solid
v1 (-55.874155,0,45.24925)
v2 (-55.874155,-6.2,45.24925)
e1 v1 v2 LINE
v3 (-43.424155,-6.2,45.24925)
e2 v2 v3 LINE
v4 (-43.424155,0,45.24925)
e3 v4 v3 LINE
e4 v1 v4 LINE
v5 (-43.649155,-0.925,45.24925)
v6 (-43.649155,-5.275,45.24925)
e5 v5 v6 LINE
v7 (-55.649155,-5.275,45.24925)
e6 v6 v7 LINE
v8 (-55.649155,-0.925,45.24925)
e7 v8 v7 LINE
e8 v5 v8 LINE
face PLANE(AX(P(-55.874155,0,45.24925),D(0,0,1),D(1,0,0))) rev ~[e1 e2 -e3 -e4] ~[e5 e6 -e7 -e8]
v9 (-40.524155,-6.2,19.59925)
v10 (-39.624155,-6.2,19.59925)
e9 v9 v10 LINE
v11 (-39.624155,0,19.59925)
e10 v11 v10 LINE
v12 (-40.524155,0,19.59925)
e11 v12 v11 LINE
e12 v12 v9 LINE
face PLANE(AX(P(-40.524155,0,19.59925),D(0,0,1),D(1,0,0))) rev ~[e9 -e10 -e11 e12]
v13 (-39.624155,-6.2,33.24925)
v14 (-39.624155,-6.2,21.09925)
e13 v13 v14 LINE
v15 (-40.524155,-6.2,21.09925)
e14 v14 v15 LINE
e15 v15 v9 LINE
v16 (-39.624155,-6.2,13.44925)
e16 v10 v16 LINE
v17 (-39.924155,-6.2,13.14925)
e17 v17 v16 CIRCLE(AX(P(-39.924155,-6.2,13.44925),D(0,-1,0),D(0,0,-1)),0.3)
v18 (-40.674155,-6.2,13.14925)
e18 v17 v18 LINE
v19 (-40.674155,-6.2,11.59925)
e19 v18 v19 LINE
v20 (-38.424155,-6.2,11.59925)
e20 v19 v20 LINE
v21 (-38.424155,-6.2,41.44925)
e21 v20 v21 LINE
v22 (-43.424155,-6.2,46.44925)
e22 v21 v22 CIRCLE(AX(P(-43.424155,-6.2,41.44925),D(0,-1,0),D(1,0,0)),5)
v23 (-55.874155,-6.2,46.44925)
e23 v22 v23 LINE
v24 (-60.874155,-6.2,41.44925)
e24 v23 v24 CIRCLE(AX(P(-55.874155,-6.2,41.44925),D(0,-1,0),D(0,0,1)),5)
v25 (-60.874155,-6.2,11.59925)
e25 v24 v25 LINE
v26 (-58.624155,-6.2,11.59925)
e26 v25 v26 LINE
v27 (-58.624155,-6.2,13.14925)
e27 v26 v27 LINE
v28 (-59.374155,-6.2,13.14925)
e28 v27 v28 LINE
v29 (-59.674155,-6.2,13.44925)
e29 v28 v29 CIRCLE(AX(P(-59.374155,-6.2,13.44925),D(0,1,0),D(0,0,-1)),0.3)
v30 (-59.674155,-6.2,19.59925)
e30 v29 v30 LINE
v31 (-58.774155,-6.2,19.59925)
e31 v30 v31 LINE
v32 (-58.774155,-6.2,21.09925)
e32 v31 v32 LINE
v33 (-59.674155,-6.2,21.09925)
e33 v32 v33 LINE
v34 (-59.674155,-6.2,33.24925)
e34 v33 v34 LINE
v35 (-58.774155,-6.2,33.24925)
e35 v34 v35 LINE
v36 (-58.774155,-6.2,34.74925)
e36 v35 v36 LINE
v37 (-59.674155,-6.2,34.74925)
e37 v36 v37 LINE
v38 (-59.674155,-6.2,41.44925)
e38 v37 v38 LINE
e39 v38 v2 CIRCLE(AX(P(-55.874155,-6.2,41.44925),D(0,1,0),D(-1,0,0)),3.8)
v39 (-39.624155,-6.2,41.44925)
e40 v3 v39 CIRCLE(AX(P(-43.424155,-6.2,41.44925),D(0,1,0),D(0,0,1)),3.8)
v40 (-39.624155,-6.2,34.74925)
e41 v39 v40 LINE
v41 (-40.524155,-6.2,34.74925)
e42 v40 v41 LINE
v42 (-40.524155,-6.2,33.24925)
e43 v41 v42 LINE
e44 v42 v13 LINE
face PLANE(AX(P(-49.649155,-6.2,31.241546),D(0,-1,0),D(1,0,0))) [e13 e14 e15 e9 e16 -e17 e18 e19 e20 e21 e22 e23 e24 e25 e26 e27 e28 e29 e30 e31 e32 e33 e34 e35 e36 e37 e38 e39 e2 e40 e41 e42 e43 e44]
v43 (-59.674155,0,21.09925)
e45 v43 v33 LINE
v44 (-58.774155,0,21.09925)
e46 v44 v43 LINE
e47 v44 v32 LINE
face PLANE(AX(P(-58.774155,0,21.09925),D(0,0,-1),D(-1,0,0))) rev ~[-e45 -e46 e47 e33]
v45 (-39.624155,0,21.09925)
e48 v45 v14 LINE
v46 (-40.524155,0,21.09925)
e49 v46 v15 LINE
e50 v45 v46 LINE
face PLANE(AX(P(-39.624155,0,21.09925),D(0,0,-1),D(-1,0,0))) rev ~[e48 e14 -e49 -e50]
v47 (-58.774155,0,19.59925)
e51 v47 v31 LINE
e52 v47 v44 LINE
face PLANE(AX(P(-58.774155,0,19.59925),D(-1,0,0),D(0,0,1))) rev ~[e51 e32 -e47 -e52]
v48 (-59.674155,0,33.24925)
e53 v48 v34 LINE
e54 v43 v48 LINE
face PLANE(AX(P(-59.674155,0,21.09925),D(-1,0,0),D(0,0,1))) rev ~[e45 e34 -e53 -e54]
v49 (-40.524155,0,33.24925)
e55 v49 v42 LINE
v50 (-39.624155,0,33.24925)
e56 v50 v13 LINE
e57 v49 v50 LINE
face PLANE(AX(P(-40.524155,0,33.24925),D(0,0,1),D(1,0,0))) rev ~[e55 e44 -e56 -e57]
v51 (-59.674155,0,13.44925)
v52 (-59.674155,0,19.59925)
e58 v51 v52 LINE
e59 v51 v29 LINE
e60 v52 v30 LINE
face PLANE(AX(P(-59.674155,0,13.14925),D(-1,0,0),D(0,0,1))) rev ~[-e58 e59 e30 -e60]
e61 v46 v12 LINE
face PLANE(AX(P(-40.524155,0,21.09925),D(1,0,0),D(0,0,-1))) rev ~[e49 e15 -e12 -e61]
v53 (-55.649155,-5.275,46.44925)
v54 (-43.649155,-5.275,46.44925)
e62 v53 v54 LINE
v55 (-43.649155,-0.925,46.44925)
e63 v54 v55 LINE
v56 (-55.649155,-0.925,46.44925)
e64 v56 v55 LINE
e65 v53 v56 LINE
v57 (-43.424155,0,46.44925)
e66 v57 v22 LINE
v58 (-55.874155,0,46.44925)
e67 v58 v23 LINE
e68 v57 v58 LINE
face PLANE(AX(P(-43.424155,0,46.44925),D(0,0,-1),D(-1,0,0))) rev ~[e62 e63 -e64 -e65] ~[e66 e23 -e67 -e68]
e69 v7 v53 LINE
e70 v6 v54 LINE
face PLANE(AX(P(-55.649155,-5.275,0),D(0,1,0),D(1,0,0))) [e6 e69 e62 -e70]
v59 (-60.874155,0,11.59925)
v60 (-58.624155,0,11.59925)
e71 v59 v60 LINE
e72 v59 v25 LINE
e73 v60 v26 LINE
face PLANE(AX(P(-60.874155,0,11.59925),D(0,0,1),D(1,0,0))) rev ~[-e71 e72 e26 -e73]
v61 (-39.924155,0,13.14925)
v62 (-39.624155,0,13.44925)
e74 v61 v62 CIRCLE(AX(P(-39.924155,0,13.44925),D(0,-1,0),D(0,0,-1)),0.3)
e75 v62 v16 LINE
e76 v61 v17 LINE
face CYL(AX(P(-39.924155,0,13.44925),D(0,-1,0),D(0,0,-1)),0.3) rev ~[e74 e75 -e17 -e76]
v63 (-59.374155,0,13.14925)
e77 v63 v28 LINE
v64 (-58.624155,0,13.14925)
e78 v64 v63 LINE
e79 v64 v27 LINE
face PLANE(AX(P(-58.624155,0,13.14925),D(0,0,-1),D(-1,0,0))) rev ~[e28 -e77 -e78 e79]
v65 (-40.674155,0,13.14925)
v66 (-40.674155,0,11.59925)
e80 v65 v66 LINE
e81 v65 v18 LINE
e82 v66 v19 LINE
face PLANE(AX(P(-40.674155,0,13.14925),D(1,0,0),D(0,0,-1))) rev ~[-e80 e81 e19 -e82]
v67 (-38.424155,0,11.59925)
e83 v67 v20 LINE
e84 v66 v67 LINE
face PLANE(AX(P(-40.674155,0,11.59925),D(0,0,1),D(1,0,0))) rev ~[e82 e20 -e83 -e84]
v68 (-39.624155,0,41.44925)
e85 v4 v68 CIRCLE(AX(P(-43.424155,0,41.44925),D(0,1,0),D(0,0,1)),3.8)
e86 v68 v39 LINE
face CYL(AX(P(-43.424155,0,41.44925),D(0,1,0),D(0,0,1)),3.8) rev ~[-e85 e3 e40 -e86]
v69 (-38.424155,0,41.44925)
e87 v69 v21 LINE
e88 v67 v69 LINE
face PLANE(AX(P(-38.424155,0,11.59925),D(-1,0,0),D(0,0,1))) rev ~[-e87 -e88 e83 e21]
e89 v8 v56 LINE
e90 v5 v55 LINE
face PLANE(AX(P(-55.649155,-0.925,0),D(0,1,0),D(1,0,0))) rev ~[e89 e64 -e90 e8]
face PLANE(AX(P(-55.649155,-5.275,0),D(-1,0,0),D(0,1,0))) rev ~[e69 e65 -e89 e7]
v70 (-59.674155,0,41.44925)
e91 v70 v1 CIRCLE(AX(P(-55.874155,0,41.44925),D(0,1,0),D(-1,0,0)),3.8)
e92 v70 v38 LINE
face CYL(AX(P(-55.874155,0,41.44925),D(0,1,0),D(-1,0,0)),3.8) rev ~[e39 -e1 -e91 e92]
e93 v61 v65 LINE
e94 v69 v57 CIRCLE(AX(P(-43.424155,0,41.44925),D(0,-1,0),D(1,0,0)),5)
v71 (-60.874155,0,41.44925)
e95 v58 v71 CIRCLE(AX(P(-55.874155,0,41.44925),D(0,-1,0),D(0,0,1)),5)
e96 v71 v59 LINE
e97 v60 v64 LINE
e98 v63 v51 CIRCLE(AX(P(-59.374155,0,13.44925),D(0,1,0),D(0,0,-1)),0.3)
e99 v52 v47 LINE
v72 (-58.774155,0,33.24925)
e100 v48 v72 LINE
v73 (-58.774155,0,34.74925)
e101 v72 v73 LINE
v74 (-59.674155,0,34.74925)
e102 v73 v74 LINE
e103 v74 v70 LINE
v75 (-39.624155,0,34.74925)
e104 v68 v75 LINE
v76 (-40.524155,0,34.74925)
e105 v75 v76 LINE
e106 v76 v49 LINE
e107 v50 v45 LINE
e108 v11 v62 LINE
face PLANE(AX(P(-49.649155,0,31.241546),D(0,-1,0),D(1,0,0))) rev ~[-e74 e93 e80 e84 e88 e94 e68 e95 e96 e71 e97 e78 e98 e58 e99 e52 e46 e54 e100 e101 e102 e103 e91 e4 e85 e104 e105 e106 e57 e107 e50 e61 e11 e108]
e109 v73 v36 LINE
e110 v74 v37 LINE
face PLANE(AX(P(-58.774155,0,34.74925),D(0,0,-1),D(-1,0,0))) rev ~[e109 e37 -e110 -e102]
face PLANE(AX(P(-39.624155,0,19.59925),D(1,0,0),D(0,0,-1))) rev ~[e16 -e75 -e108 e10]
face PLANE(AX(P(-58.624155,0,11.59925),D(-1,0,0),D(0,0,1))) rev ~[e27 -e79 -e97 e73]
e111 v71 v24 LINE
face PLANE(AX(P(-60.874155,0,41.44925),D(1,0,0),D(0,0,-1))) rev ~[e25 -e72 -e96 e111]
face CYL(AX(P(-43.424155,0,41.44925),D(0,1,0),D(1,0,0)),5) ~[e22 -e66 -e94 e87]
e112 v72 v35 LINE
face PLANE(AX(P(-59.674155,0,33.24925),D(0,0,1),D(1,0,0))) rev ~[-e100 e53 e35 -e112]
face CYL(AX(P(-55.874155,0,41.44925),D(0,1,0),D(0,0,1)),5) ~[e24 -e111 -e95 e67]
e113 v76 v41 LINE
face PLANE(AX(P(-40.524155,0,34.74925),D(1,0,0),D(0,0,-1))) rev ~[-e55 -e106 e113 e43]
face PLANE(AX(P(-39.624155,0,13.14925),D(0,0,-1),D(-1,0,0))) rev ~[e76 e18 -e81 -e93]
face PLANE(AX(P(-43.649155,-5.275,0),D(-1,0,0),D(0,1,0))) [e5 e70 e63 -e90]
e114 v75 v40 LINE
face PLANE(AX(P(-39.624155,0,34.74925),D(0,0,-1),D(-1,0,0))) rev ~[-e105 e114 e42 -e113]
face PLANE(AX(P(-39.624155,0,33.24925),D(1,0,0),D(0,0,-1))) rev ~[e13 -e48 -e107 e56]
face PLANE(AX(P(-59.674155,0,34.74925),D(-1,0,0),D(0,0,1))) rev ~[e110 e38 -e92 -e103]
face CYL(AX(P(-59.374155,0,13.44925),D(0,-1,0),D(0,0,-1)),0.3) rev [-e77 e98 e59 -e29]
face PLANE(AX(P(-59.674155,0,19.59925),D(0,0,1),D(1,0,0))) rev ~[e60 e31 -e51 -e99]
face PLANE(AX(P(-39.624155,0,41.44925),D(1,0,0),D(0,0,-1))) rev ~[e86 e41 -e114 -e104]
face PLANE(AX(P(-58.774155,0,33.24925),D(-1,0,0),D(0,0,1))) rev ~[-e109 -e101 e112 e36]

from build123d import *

# Parameters (mm, degrees)
F1_DEPTH     = 9.79181
F2_T         = -2.5
F3_R         = 5
F4_T1_DEPTH  = 80
F4_T3_DEPTH  = 40
F4_T6_ANGLE  = 90
F4_T8_ANGLE  = 90
F4_T10_ANGLE = 90
F4_T12_ANGLE = 90
F5_R         = 7
F6_R         = 4.5
F7_DEPTH     = 130
F8_T         = -2.5
F12_DEPTH    = 6.2
F13_R        = 0.3
F14_R        = 0.3
F15_W        = 12
F15_H        = 4.35
F16_DEPTH    = 67.90149


# Not quite as in the source:
# - a fillet or chamfer that OpenCascade refuses, or shapes differently, is made with other operations: its cross-section is extruded or revolved along the edge and cut away or added


with BuildPart() as f1:
    # F0 (on Front) → F1 (new body)
    with BuildSketch(Plane.XZ):
        with BuildLine():
            Line((33.4467580169, 25.7645070341), (-46.5532419831, 25.7645070341))
            ThreePointArc((-46.5532419831, 25.7645070341), (-50.088775889, 24.30004094), (-51.5532419831, 20.7645070341))
            Line((-51.5532419831, 20.7645070341), (-51.5532419831, -19.2354929659))
            ThreePointArc((-51.5532419831, -19.2354929659), (-50.088775889, -22.7710268718), (-46.5532419831, -24.2354929659))
            Line((-46.5532419831, -24.2354929659), (33.4467580169, -24.2354929659))
            ThreePointArc((33.4467580169, -24.2354929659), (36.9822919229, -22.7710268718), (38.4467580169, -19.2354929659))
            Line((38.4467580169, -19.2354929659), (38.4467580169, 20.7645070341))
            ThreePointArc((38.4467580169, 20.7645070341), (36.9822919229, 24.30004094), (33.4467580169, 25.7645070341))
        make_face()
    extrude(amount=F1_DEPTH)

    # F2
    f2_openings = [f1.faces().sort_by_distance(p)[0] for p in [
        (-6.553242, -9.79181, 0.764507),
    ]]
    offset(amount=F2_T, openings=f2_openings)

    # F3
    f3_edges = [f1.edges().sort_by_distance(p)[0] for p in [
        (-6.553242, -2.5, 23.264507),
    ]]
    fillet(f3_edges, radius=F3_R)

    # F4: fillet of radius 5 on 1 edges, made by hand

    # F4_s2 → F4_t1 (cut)
    with BuildSketch(Plane.YZ.offset(-46.5532419831)):
        with BuildLine():
            ThreePointArc((-6.145905, 23.0776584685), (-8.7774388713, 24.8717434082), (-9.79181, 27.890809903))
            Line((-9.79181, 27.890809903), (-10.29181, 27.890809903))
            Line((-10.29181, 27.890809903), (-10.29181, 23.2645070341))
            Line((-10.29181, 23.2645070341), (-9.79181, 22.7645070341))
            ThreePointArc((-9.79181, 22.7645070341), (-7.5, 22.7645070341), (-6.2813145, 22.5963433251))
            Line((-6.2813145, 22.5963433251), (-6.145905, 23.0776584685))
        make_face()
        with BuildLine():
            ThreePointArc((-9.79181, -26.3617958348), (-8.7774388713, -23.34272934), (-6.145905, -21.5486444004))
            Line((-6.145905, -21.5486444004), (-6.2813145, -21.0673292569))
            ThreePointArc((-6.2813145, -21.0673292569), (-7.5, -21.2354929659), (-9.79181, -21.2354929659))
            Line((-9.79181, -21.2354929659), (-10.29181, -21.7354929659))
            Line((-10.29181, -21.7354929659), (-10.29181, -26.3617958348))
            Line((-10.29181, -26.3617958348), (-9.79181, -26.3617958348))
        make_face()
    extrude(amount=F4_T1_DEPTH, mode=Mode.SUBTRACT)

    # F4_s4 → F4_t3 (cut)
    with BuildSketch(Plane.XY.offset(-19.2354929659)):
        with BuildLine():
            ThreePointArc((-53.679544852, -9.79181), (-50.6604783572, -8.7774388713), (-48.8663934175, -6.145905))
            Line((-48.8663934175, -6.145905), (-48.3850782741, -6.2813145))
            ThreePointArc((-48.3850782741, -6.2813145), (-48.5532419831, -7.5), (-48.5532419831, -9.79181))
            Line((-48.5532419831, -9.79181), (-49.0532419831, -10.29181))
            Line((-49.0532419831, -10.29181), (-53.679544852, -10.29181))
            Line((-53.679544852, -10.29181), (-53.679544852, -9.79181))
        make_face()
        with BuildLine():
            ThreePointArc((40.5730608858, -9.79181), (37.5539943911, -8.7774388713), (35.7599094514, -6.145905))
            Line((35.7599094514, -6.145905), (35.278594308, -6.2813145))
            ThreePointArc((35.278594308, -6.2813145), (35.4467580169, -7.5), (35.4467580169, -9.79181))
            Line((35.4467580169, -9.79181), (35.9467580169, -10.29181))
            Line((35.9467580169, -10.29181), (40.5730608858, -10.29181))
            Line((40.5730608858, -10.29181), (40.5730608858, -9.79181))
        make_face()
    extrude(amount=F4_T3_DEPTH, mode=Mode.SUBTRACT)

    # F4_s5 → F4_t6 (revolve, cut)
    with BuildSketch(Plane.XY.offset(20.7645070341)):
        with BuildLine():
            ThreePointArc((35.9467580169, -4.79181), (37.411224111, -8.3273439059), (40.9467580169, -9.79181))
            Line((40.9467580169, -9.79181), (40.9467580169, -9.89181))
            Line((40.9467580169, -9.89181), (35.8467580169, -9.89181))
            Line((35.8467580169, -9.89181), (35.8467580169, -4.79181))
            Line((35.8467580169, -4.79181), (35.9467580169, -4.79181))
        make_face()
    revolve(axis=Axis((33.4467580169, -9.79181, 20.7645070341), (0, -1, 0)), revolution_arc=F4_T6_ANGLE, mode=Mode.SUBTRACT)

    # F4_s7 → F4_t8 (revolve, cut)
    with BuildSketch(Plane.YZ.offset(-46.5532419831)):
        with BuildLine():
            ThreePointArc((-9.79181, 28.2645070341), (-8.3273439059, 24.7289731282), (-4.79181, 23.2645070341))
            Line((-4.79181, 23.2645070341), (-4.79181, 23.1645070341))
            Line((-4.79181, 23.1645070341), (-9.89181, 23.1645070341))
            Line((-9.89181, 23.1645070341), (-9.89181, 28.2645070341))
            Line((-9.89181, 28.2645070341), (-9.79181, 28.2645070341))
        make_face()
    revolve(axis=Axis((-46.5532419831, -9.79181, 20.7645070341), (0, -1, 0)), revolution_arc=F4_T8_ANGLE, mode=Mode.SUBTRACT)

    # F4_s9 → F4_t10 (revolve, cut)
    with BuildSketch(Plane.XY.offset(-19.2354929659)):
        with BuildLine():
            ThreePointArc((-54.0532419831, -9.79181), (-50.5177080771, -8.3273439059), (-49.0532419831, -4.79181))
            Line((-49.0532419831, -4.79181), (-48.9532419831, -4.79181))
            Line((-48.9532419831, -4.79181), (-48.9532419831, -9.89181))
            Line((-48.9532419831, -9.89181), (-54.0532419831, -9.89181))
            Line((-54.0532419831, -9.89181), (-54.0532419831, -9.79181))
        make_face()
    revolve(axis=Axis((-46.5532419831, -9.79181, -19.2354929659), (0, -1, 0)), revolution_arc=F4_T10_ANGLE, mode=Mode.SUBTRACT)

    # F4_s11 → F4_t12 (revolve, cut)
    with BuildSketch(Plane.YZ.offset(33.4467580169)):
        with BuildLine():
            ThreePointArc((-9.79181, -26.7354929659), (-8.3273439059, -23.19995906), (-4.79181, -21.7354929659))
            Line((-4.79181, -21.7354929659), (-4.79181, -21.6354929659))
            Line((-4.79181, -21.6354929659), (-9.89181, -21.6354929659))
            Line((-9.89181, -21.6354929659), (-9.89181, -26.7354929659))
            Line((-9.89181, -26.7354929659), (-9.79181, -26.7354929659))
        make_face()
    revolve(axis=Axis((33.4467580169, -9.79181, -19.2354929659), (0, -1, 0)), revolution_arc=F4_T12_ANGLE, mode=Mode.SUBTRACT)

    # F5
    f5_edges = [f1.edges().sort_by_distance(p)[0] for p in [
        (-6.553242, 0, 25.764507),
    ]]
    fillet(f5_edges, radius=F5_R)


with BuildPart() as f7:
    # F6 (on Front) → F7 (new body)
    with BuildSketch(Plane.XZ):
        with Locations((-6.3970589777, 0)):
            Circle(F6_R)
    extrude(amount=-F7_DEPTH)

    # F8
    f8_openings = [f7.faces().sort_by_distance(p)[0] for p in [
        (-6.397059, 130, 0),
    ]]
    offset(amount=F8_T, openings=f8_openings)


with BuildPart() as f12:
    # F11 (on Front) → F12 (new body)
    with BuildSketch(Plane.XZ):
        with BuildLine():
            Line((-43.4241547674, 46.4492497861), (-55.8741547674, 46.4492497861))
            ThreePointArc((-55.8741547674, 46.4492497861), (-59.4096886733, 44.9847836921), (-60.8741547674, 41.4492497861))
            Line((-60.8741547674, 41.4492497861), (-60.8741547674, 11.5992497861))
            Line((-60.8741547674, 11.5992497861), (-58.6241547674, 11.5992497861))
            Line((-58.6241547674, 11.5992497861), (-58.6241547674, 13.1492497861))
            Line((-58.6241547674, 13.1492497861), (-59.6741547674, 13.1492497861))
            Line((-59.6741547674, 13.1492497861), (-59.6741547674, 19.5992497861))
            Line((-59.6741547674, 19.5992497861), (-58.7741547674, 19.5992497861))
            Line((-58.7741547674, 19.5992497861), (-58.7741547674, 21.0992497861))
            Line((-58.7741547674, 21.0992497861), (-59.6741547674, 21.0992497861))
            Line((-59.6741547674, 21.0992497861), (-59.6741547674, 33.2492497861))
            Line((-59.6741547674, 33.2492497861), (-58.7741547674, 33.2492497861))
            Line((-58.7741547674, 33.2492497861), (-58.7741547674, 34.7492497861))
            Line((-58.7741547674, 34.7492497861), (-59.6741547674, 34.7492497861))
            Line((-59.6741547674, 34.7492497861), (-59.6741547674, 41.4492497861))
            ThreePointArc((-59.6741547674, 41.4492497861), (-58.5611605359, 44.1362555546), (-55.8741547674, 45.2492497861))
            Line((-55.8741547674, 45.2492497861), (-43.4241547674, 45.2492497861))
            ThreePointArc((-43.4241547674, 45.2492497861), (-40.7371489989, 44.1362555546), (-39.6241547674, 41.4492497861))
            Line((-39.6241547674, 41.4492497861), (-39.6241547674, 34.7492497861))
            Line((-39.6241547674, 34.7492497861), (-40.5241547674, 34.7492497861))
            Line((-40.5241547674, 34.7492497861), (-40.5241547674, 33.2492497861))
            Line((-40.5241547674, 33.2492497861), (-39.6241547674, 33.2492497861))
            Line((-39.6241547674, 33.2492497861), (-39.6241547674, 21.0992497861))
            Line((-39.6241547674, 21.0992497861), (-40.5241547674, 21.0992497861))
            Line((-40.5241547674, 21.0992497861), (-40.5241547674, 19.5992497861))
            Line((-40.5241547674, 19.5992497861), (-39.6241547674, 19.5992497861))
            Line((-39.6241547674, 19.5992497861), (-39.6241547674, 13.1492497861))
            Line((-39.6241547674, 13.1492497861), (-40.6741547674, 13.1492497861))
            Line((-40.6741547674, 13.1492497861), (-40.6741547674, 11.5992497861))
            Line((-40.6741547674, 11.5992497861), (-38.4241547674, 11.5992497861))
            Line((-38.4241547674, 11.5992497861), (-38.4241547674, 41.4492497861))
            ThreePointArc((-38.4241547674, 41.4492497861), (-39.8886208615, 44.9847836921), (-43.4241547674, 46.4492497861))
        make_face()
    extrude(amount=F12_DEPTH)

    # F13
    f13_edges = [f12.edges().sort_by_distance(p)[0] for p in [
        (-59.674155, -3.1, 13.14925),
    ]]
    fillet(f13_edges, radius=F13_R)

    # F14
    f14_edges = [f12.edges().sort_by_distance(p)[0] for p in [
        (-39.624155, -3.1, 13.14925),
    ]]
    fillet(f14_edges, radius=F14_R)

    # F15 (on Top) → F16 (cut)
    with BuildSketch(Plane.XY):
        with Locations((-49.6491547674, -3.1)):
            Rectangle(F15_W, F15_H)
    extrude(amount=F16_DEPTH, mode=Mode.SUBTRACT)


solid = f12.part
